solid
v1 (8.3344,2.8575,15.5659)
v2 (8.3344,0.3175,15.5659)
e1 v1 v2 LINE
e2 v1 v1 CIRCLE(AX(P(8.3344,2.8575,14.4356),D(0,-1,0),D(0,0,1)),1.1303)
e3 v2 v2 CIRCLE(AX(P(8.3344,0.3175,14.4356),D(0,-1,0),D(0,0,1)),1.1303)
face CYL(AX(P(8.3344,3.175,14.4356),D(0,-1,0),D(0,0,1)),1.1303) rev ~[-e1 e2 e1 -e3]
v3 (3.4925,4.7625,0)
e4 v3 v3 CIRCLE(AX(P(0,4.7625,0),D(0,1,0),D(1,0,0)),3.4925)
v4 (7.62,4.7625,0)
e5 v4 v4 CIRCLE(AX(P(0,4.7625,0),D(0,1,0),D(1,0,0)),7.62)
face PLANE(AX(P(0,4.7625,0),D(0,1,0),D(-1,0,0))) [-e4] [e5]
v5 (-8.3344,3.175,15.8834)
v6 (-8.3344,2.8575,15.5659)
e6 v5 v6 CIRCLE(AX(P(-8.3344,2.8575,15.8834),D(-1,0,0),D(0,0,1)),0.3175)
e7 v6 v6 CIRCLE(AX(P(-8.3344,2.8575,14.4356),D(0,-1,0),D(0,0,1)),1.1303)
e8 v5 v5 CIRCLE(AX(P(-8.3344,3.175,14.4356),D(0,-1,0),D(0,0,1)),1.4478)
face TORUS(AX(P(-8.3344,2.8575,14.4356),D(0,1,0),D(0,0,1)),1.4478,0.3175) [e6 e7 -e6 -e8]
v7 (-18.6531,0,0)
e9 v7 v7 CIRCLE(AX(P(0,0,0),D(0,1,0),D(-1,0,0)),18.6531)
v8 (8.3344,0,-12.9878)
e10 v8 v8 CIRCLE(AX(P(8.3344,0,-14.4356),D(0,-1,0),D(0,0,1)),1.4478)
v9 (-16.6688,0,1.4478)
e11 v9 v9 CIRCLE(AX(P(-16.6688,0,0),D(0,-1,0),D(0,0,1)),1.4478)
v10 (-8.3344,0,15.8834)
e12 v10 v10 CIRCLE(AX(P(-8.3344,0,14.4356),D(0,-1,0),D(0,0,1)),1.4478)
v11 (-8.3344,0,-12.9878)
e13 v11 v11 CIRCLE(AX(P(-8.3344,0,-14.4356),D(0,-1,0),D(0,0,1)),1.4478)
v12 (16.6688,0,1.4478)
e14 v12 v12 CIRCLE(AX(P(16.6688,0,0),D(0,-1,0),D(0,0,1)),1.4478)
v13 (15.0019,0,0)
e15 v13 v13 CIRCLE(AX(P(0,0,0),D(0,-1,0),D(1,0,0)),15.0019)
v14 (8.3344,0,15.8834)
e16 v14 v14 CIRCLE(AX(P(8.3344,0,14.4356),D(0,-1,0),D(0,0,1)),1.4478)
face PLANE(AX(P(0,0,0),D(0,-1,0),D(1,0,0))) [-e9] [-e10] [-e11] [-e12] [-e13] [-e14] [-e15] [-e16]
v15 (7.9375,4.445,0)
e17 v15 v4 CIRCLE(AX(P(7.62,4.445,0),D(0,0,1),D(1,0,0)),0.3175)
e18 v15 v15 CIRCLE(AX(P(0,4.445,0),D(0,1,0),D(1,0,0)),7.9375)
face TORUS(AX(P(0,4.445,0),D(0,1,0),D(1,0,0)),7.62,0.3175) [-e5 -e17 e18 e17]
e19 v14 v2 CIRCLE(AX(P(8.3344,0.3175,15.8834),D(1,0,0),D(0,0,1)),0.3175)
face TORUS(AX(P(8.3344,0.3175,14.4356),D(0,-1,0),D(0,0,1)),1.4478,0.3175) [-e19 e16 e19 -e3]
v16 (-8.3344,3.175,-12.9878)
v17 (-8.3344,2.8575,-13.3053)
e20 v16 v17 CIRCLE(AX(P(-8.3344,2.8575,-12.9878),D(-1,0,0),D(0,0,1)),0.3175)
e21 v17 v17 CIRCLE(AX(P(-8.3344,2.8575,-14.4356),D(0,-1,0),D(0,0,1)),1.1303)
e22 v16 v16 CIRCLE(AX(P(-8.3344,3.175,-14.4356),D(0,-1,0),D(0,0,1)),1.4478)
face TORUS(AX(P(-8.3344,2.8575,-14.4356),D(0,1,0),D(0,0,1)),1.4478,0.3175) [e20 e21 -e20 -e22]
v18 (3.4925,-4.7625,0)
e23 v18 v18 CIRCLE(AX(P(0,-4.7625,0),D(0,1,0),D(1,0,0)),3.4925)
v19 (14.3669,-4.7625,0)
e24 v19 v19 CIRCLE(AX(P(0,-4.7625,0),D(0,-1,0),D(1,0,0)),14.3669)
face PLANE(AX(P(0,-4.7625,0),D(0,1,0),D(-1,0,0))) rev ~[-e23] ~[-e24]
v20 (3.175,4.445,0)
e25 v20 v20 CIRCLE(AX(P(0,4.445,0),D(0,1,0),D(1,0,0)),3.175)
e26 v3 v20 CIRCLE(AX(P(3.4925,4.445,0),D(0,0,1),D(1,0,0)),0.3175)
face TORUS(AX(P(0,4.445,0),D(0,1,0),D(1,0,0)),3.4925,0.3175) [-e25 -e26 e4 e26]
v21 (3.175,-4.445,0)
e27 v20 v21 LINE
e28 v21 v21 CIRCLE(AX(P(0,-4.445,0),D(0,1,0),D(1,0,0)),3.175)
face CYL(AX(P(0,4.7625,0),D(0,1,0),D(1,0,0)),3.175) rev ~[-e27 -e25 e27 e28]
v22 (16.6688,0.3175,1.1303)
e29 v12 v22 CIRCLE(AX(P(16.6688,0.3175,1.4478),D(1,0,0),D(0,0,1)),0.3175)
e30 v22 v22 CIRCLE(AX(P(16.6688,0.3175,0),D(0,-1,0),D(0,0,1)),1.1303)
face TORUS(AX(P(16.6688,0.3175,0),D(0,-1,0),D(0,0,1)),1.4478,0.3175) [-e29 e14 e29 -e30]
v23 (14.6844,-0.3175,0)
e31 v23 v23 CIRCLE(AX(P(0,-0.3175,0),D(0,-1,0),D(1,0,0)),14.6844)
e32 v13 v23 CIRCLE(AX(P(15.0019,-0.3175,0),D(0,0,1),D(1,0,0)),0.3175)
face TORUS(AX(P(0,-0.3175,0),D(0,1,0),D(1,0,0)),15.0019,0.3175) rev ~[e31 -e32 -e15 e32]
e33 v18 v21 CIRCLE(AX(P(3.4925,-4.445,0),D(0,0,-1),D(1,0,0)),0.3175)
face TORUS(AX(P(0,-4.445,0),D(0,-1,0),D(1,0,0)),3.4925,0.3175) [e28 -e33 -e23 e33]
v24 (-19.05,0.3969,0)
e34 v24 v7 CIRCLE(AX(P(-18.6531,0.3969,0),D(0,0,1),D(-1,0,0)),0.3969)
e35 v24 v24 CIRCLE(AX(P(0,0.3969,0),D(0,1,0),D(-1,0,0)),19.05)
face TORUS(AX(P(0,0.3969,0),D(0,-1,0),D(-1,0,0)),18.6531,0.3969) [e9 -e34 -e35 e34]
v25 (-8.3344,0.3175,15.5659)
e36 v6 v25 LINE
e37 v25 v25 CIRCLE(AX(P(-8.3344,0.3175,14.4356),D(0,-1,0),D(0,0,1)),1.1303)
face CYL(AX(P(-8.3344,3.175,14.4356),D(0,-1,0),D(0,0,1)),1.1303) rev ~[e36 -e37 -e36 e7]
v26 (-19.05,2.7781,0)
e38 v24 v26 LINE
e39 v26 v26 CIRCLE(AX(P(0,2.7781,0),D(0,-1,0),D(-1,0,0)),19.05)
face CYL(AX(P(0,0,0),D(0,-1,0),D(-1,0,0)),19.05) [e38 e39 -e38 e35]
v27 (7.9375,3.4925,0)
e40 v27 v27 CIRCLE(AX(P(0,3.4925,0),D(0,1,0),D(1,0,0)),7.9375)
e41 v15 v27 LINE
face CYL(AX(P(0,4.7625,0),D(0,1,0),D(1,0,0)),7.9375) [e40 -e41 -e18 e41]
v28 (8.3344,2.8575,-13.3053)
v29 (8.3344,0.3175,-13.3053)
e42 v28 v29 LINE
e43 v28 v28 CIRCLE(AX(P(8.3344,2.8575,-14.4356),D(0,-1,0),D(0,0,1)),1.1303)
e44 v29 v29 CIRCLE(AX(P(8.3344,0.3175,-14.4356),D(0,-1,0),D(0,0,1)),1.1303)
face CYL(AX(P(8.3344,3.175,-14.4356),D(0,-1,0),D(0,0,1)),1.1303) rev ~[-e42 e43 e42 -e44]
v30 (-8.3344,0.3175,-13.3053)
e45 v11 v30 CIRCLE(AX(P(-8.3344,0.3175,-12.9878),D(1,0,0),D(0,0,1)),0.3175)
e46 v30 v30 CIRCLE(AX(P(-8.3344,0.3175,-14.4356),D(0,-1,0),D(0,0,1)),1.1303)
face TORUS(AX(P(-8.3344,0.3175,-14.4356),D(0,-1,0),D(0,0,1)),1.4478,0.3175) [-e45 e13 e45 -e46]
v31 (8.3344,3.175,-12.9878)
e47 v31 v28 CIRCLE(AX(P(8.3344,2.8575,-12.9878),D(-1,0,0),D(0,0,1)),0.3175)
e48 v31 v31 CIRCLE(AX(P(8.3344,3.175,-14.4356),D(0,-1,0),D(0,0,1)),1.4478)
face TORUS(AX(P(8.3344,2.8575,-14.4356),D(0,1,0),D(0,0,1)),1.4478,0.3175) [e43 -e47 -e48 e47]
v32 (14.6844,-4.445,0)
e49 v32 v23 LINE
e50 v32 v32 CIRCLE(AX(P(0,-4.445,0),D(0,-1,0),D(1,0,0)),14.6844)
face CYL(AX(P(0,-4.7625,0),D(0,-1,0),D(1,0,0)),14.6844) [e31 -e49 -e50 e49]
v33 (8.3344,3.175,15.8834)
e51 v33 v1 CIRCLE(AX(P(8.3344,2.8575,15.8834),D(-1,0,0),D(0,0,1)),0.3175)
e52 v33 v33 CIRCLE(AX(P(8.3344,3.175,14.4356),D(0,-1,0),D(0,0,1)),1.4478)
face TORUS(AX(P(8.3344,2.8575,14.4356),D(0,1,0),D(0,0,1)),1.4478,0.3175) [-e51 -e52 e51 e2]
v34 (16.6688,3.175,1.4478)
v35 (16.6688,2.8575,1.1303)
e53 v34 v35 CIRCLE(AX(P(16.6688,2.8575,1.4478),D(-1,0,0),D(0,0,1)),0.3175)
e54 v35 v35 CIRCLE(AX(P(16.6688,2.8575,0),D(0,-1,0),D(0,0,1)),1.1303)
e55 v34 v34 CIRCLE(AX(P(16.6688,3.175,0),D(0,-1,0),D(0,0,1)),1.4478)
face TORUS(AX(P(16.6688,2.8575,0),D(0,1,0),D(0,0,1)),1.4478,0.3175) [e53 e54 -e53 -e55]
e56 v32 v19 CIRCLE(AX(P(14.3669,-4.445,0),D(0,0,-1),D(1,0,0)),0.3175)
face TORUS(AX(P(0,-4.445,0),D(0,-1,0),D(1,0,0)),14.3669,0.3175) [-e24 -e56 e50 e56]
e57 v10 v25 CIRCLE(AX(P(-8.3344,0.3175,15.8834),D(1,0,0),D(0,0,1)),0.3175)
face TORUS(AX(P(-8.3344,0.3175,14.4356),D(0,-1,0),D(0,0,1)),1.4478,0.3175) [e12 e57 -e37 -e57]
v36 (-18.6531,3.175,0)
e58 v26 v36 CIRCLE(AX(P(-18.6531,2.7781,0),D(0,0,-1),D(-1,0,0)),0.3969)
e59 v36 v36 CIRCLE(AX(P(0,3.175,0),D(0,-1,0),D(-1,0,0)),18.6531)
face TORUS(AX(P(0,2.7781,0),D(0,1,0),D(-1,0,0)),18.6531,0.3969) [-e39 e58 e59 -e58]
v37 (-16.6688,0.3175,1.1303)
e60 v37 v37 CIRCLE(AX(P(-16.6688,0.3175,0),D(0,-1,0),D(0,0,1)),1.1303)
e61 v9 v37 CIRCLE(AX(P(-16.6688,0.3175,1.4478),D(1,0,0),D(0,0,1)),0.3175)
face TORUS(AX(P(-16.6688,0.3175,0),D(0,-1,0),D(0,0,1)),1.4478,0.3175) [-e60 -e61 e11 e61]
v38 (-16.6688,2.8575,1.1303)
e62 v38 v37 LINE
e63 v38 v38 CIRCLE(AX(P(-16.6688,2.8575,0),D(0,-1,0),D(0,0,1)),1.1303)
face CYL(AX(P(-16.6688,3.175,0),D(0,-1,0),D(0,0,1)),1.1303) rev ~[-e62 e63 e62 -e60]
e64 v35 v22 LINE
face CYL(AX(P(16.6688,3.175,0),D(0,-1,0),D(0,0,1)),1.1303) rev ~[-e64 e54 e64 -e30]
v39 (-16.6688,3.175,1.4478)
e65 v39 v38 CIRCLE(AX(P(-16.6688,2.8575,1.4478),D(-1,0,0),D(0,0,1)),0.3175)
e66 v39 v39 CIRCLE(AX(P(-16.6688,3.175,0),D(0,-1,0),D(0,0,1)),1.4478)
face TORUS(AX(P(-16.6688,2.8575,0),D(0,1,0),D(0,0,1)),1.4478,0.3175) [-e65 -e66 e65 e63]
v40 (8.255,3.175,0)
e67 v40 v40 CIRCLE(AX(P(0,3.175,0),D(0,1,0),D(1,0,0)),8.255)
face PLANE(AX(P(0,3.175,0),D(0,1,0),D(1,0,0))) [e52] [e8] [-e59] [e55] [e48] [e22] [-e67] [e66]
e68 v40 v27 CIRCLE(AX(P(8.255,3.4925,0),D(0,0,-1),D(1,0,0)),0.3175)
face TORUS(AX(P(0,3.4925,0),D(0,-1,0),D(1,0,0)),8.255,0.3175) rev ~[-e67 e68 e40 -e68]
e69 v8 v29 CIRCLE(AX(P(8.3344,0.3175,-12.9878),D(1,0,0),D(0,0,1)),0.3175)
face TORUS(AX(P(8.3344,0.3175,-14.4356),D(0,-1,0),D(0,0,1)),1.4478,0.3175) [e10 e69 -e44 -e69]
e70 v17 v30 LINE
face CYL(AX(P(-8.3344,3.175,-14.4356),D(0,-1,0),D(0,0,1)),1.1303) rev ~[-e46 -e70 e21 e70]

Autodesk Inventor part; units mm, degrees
ref_plane "YZ Plane" through (0, 0, 0) normal (1, 0, 0) x (0, 1, 0)
ref_plane "XZ Plane" through (0, 0, 0) normal (0, 1, 0) x (-1, 0, 0)
ref_plane "XY Plane" through (0, 0, 0) normal (0, 0, 1) x (1, 0, 0)
sketch "Sketch1" plane through (0, 0, 0) normal (0, 1, 0) x (-1, 0, 0)
  circle A0 centre (0, 0) radius 19.05
  dimension "d0" = 38.1
extrude "Extrusion1" add sketch "Sketch1" along normal mid plane 9.525
sketch "Sketch2" plane through (0, 4.7625, 0) normal (0, 1, 0) x (1, 0, 0)
  circle A0 centre (0, 0) radius 7.9375
  circle A1 centre (0, 0) radius 19.05
  dimension "d3" = 15.875
  dimension "d4" = 38.1
extrude "Extrusion2" cut sketch "Sketch2" against normal blind 1.5875
sketch "Sketch3" plane through (0, -4.7625, 0) normal (0, -1, 0) x (1, 0, 0)
  circle A0 centre (0, 0) radius 14.6844
  circle A1 centre (0, 0) radius 19.05
  dimension "d7" = 29.3687
  dimension "d8" = 38.1
extrude "Extrusion3" cut sketch "Sketch3" against normal blind 4.7625
sketch "Sketch4" plane through (0, 4.7625, 0) normal (0, 1, 0) x (1, 0, 0)
  circle A0 centre (0, 0) radius 3.175
  dimension "d11" = 6.35
extrude "Extrusion4" cut sketch "Sketch4" against normal blind 25.4
sketch "Sketch5" plane through (0, 3.175, 0) normal (0, 1, 0) x (1, 0, 0)
  point P0 (0, 0)
  point P1 (-16.6688, 0)
  point P2 (-8.3344, -14.4356)
  point P3 (8.3344, -14.4356)
  point P4 (16.6688, 0)
  point P5 (8.3344, 14.4356)
  point P6 (-8.3344, 14.4356)
  dimension "d14" = 0
  dimension "d15" = 16.6687
  dimension "d18" = 360
hole "Hole1" at (-16.6688, 3.175, 0) at (-8.3344, 3.175, 14.4356) at (8.3344, 3.175, 14.4356) at (16.6688, 3.175, 0) at (8.3344, 3.175, -14.4356) at (-8.3344, 3.175, -14.4356) direction (0, -1, 0) diameter 2.2606 depth 25.4 tip angle 118
fillet "Fillet1" radius 0.3969 2 edges at (19.05, 3.175, 0) (19.05, 0, 0)
thread "Thread1" size "3-48 UNC" class "2B" standard "ANSI Unified Screw Threads" full length
thread "Thread2" size "3-48 UNC" class "2B" standard "ANSI Unified Screw Threads" full length
thread "Thread3" size "3-48 UNC" class "2B" standard "ANSI Unified Screw Threads" full length
thread "Thread4" size "3-48 UNC" class "2B" standard "ANSI Unified Screw Threads" full length
thread "Thread5" size "3-48 UNC" class "2B" standard "ANSI Unified Screw Threads" full length
thread "Thread6" size "3-48 UNC" class "2B" standard "ANSI Unified Screw Threads" full length
fillet "Fillet2" radius 0.3175 18 edges at (16.6688, 3.175, -1.1303) (-7.9375, 3.175, 0) (-7.9375, 4.7625, 0) (-3.175, 4.7625, 0) (8.3344, 3.175, -15.5659) (-8.3344, 3.175, -15.5659) (-16.6688, 3.175, -1.1303) (-8.3344, 3.175, 13.3053) (8.3344, 3.175, 13.3053) (-14.6844, -4.7625, 0) (8.3344, 0, 13.3053) (16.6688, 0, -1.1303) (8.3344, 0, -15.5659) (-8.3344, 0, -15.5659) (-3.175, -4.7625, 0) (-8.3344, 0, 13.3053) (-16.6688, 0, -1.1303) (-14.6844, 0, 0)
properties part number "Crankcase Cover" material "Gold"
